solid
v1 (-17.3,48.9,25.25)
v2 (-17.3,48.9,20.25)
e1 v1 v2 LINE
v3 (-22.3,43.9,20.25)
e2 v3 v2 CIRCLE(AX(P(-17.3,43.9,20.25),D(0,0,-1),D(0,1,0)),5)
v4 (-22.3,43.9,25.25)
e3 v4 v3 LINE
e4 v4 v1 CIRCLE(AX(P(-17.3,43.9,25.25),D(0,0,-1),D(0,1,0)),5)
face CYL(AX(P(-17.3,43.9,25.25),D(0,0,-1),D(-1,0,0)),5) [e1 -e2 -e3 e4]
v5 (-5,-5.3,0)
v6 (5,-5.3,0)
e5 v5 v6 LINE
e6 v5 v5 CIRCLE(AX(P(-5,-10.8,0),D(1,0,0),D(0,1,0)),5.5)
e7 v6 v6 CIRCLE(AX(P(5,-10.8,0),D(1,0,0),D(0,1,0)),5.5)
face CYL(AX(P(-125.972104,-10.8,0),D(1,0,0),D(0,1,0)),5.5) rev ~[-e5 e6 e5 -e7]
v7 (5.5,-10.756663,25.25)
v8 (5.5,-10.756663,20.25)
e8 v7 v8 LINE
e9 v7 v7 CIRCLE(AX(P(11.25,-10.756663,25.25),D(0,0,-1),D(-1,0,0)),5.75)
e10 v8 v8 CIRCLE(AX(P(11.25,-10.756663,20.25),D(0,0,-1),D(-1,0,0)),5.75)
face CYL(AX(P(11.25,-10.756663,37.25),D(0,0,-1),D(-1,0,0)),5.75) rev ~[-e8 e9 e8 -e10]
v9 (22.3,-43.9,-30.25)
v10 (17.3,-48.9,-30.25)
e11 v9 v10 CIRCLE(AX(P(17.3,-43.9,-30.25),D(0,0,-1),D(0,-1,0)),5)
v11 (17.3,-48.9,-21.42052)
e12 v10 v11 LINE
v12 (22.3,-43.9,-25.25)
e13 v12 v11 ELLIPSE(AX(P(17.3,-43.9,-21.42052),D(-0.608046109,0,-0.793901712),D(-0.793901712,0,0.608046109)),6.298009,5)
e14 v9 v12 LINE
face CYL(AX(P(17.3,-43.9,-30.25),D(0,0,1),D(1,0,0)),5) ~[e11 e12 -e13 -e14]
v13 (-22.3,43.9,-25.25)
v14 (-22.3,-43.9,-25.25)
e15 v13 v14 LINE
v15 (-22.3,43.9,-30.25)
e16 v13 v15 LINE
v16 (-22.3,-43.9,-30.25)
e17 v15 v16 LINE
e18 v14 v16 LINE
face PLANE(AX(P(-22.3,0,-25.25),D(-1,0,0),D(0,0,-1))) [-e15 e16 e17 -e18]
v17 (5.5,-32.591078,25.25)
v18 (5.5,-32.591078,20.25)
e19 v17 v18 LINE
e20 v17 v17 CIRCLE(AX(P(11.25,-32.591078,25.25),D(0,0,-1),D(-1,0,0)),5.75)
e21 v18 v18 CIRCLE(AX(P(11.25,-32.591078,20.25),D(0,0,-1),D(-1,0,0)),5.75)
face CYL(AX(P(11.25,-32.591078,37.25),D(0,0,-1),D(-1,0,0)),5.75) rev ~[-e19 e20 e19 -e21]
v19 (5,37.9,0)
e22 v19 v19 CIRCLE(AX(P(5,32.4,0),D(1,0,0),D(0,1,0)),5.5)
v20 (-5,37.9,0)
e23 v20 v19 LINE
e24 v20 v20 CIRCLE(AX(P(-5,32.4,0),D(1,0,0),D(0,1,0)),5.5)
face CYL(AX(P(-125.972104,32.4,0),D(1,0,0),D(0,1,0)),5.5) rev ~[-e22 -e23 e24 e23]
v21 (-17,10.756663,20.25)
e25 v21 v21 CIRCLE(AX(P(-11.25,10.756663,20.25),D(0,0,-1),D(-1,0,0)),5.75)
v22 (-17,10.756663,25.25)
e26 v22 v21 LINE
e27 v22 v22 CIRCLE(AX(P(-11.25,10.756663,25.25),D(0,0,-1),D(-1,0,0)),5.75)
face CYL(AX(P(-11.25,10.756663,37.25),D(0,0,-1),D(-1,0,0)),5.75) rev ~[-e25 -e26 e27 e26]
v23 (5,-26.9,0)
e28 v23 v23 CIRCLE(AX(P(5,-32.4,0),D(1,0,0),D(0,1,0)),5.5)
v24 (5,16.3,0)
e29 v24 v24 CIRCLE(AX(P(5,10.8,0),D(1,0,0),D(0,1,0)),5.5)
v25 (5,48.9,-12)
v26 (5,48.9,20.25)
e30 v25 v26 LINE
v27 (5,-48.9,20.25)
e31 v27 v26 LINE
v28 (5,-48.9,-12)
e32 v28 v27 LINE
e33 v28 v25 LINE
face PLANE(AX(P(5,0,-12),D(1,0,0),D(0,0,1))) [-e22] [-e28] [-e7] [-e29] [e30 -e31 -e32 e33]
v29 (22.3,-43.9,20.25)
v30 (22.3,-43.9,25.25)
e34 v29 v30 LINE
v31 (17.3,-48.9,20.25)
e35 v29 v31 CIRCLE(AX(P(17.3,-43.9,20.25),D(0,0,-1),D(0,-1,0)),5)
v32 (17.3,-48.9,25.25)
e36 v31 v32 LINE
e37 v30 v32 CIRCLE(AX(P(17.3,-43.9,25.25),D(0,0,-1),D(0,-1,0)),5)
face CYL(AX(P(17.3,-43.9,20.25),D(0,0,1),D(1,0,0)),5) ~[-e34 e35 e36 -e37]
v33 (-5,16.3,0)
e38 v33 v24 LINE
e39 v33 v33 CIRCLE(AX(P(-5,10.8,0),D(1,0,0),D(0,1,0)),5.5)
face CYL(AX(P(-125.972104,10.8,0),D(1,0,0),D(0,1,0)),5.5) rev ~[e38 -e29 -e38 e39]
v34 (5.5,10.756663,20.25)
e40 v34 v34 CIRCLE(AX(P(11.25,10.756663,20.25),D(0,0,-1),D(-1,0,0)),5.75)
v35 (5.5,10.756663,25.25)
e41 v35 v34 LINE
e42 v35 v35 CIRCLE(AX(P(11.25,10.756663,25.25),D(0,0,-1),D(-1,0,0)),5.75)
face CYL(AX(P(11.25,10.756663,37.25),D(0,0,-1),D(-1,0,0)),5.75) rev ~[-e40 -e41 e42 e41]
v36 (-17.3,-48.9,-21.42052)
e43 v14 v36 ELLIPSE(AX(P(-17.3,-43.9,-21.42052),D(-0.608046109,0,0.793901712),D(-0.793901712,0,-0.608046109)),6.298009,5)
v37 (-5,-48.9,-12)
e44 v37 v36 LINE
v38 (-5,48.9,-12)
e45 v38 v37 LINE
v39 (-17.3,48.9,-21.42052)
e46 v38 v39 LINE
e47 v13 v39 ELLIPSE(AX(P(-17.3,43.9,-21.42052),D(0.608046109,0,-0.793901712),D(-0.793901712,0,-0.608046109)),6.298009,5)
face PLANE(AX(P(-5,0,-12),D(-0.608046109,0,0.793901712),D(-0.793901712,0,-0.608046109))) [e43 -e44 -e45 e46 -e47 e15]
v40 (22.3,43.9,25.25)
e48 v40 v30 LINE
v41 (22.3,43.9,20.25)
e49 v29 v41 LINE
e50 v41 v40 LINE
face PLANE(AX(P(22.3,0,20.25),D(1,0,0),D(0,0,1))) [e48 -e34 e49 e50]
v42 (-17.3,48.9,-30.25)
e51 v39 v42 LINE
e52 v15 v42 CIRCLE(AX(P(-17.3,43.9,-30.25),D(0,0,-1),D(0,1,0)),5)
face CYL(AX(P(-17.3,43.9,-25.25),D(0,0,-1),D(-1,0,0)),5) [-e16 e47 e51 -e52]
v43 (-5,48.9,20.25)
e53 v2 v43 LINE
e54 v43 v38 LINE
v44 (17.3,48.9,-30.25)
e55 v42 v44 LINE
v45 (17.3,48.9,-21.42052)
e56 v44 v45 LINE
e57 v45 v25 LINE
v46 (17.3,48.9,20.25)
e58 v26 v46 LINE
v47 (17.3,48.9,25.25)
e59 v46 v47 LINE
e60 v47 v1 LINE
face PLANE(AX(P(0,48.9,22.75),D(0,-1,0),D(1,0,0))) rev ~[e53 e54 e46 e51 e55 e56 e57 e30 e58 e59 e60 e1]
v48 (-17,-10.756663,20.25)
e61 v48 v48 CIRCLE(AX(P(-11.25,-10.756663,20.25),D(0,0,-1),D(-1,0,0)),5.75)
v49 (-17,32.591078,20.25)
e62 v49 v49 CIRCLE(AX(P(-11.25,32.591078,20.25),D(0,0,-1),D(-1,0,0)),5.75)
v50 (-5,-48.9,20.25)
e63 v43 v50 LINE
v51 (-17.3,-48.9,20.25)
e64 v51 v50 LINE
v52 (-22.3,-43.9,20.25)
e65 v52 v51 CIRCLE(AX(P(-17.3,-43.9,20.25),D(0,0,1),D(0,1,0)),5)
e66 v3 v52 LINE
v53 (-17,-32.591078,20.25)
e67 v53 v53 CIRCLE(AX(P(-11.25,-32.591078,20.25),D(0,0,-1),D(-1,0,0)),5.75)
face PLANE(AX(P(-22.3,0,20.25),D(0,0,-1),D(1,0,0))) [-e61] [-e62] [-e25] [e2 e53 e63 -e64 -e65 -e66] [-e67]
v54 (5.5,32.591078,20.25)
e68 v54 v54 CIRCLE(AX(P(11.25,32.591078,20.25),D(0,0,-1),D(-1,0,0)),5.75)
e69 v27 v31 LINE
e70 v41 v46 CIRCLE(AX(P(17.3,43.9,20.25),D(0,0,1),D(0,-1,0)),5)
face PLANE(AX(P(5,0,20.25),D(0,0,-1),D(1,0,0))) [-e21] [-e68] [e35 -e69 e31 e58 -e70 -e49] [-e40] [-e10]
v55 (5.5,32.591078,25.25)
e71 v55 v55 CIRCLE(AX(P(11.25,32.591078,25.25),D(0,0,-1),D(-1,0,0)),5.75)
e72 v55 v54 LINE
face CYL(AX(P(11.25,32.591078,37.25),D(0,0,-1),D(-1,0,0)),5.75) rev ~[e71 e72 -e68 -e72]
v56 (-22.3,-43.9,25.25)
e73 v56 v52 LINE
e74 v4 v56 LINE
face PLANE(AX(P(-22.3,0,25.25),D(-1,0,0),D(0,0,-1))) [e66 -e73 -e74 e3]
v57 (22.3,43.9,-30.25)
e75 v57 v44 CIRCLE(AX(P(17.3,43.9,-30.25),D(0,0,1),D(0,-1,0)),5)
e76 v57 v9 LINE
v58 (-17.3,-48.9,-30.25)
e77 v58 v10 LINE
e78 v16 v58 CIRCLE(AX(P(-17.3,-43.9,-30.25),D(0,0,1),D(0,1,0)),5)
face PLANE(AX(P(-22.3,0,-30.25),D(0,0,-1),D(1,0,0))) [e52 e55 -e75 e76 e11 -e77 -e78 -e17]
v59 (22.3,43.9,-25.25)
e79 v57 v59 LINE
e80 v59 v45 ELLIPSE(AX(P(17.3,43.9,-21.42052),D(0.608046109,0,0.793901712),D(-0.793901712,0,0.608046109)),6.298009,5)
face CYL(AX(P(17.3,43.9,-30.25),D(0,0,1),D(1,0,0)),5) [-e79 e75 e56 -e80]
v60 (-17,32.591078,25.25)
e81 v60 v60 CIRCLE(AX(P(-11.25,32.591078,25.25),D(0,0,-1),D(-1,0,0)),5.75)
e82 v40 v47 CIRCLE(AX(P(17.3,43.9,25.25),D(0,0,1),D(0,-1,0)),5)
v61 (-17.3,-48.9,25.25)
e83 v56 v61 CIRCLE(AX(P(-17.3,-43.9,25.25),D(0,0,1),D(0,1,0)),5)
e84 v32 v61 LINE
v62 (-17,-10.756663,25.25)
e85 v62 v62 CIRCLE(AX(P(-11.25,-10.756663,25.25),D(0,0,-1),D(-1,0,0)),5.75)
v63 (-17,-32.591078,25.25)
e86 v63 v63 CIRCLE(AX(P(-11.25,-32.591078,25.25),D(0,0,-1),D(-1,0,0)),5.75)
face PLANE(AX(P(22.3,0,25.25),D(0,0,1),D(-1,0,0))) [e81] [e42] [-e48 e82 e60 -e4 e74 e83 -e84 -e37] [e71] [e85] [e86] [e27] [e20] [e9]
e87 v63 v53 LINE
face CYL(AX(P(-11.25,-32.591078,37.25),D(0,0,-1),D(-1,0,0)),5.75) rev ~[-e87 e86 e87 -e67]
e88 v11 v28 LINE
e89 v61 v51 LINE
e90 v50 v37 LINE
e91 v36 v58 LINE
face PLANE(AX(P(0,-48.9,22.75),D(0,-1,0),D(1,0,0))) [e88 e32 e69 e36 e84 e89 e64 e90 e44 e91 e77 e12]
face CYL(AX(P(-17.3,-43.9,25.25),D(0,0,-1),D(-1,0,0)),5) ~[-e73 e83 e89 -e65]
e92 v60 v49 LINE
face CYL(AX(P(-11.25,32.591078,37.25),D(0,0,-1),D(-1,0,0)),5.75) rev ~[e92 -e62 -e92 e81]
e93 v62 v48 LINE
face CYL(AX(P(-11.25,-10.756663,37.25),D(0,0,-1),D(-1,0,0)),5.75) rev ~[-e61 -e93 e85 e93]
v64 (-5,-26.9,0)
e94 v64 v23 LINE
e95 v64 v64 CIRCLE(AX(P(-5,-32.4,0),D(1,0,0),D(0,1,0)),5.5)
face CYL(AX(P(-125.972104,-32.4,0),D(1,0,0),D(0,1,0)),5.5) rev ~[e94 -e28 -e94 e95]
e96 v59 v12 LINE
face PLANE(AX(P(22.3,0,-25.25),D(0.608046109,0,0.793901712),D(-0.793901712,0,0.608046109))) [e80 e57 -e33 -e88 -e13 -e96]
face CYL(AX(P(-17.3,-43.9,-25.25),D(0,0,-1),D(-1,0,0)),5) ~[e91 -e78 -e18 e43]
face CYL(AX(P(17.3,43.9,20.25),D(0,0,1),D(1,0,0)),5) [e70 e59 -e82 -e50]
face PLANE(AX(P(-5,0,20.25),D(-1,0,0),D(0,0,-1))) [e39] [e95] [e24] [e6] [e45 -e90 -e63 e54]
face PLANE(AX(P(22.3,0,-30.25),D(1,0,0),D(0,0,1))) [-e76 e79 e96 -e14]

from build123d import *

# Parameters (mm, degrees)
F1_DEPTH = 48.9
F3_R     = 5
F5_D     = 11
F7_D     = 11.5
F7_DEPTH = 12
F7_TIP   = 3.4549485594


# Not quite as in the source:
# - a feature names something its author has since deleted; it is built from what else it names


with BuildPart() as f1:
    # F0 (on Front) → F1 (new body, symmetric)
    with BuildSketch(Plane.XZ):
        Polygon((-5, 20.25), (5, 20.25), (22.3, 20.25), (22.3, 25.25), (-22.3, 25.25), (-22.3, 20.25), align=None)
        Polygon((5, 0), (5, 20.25), (-5, 20.25), (-5, -12), (-5, -20.25), (0, -20.25), (5, -20.25), (5, -12), align=None)
        Polygon((-5, -20.25), (-5, -12), (-22.3, -25.25), (-22.3, -30.25), (22.3, -30.25), (22.3, -25.25), (5, -12), (5, -20.25), (0, -20.25), align=None)
    extrude(amount=F1_DEPTH, both=True)

    # F3
    f3_edges = [f1.edges().sort_by_distance(p)[0] for p in [
        (-22.3, 48.9, 22.75),
        (-22.3, -48.9, 22.75),
        (22.3, 48.9, 22.75),
        (22.3, -48.9, 22.75),
        (-22.3, -48.9, -27.75),
        (22.3, -48.9, -27.75),
        (-22.3, 48.9, -27.75),
        (22.3, 48.9, -27.75),
    ]]
    fillet(f3_edges, radius=F3_R)

    # F5 (through all)
    with Locations(Plane(origin=(-5, 0, 0), x_dir=(0, -1, 0), z_dir=(-1, 0, 0))):
        with Locations((32.4, 0), (10.8, 0), (-10.8, 0), (-32.4, 0)):
            Hole(F5_D / 2)

    # F7
    with Locations(Plane.XY.offset(25.25)):
        with Locations((-11.25, 32.5910784304), (11.25, 32.5910784304), (11.25, 10.7566630468), (-11.25, 10.7566630468), (-11.25, -10.7566630468), (11.25, -10.7566630468), (11.25, -32.5910784304), (-11.25, -32.5910784304)):
            Hole(F7_D / 2, depth=F7_DEPTH)
            with Locations((0, 0, -(F7_DEPTH + F7_TIP / 2))):  # 118° drill point
                Cone(0, F7_D / 2, F7_TIP, mode=Mode.SUBTRACT)


solid = f1.part
